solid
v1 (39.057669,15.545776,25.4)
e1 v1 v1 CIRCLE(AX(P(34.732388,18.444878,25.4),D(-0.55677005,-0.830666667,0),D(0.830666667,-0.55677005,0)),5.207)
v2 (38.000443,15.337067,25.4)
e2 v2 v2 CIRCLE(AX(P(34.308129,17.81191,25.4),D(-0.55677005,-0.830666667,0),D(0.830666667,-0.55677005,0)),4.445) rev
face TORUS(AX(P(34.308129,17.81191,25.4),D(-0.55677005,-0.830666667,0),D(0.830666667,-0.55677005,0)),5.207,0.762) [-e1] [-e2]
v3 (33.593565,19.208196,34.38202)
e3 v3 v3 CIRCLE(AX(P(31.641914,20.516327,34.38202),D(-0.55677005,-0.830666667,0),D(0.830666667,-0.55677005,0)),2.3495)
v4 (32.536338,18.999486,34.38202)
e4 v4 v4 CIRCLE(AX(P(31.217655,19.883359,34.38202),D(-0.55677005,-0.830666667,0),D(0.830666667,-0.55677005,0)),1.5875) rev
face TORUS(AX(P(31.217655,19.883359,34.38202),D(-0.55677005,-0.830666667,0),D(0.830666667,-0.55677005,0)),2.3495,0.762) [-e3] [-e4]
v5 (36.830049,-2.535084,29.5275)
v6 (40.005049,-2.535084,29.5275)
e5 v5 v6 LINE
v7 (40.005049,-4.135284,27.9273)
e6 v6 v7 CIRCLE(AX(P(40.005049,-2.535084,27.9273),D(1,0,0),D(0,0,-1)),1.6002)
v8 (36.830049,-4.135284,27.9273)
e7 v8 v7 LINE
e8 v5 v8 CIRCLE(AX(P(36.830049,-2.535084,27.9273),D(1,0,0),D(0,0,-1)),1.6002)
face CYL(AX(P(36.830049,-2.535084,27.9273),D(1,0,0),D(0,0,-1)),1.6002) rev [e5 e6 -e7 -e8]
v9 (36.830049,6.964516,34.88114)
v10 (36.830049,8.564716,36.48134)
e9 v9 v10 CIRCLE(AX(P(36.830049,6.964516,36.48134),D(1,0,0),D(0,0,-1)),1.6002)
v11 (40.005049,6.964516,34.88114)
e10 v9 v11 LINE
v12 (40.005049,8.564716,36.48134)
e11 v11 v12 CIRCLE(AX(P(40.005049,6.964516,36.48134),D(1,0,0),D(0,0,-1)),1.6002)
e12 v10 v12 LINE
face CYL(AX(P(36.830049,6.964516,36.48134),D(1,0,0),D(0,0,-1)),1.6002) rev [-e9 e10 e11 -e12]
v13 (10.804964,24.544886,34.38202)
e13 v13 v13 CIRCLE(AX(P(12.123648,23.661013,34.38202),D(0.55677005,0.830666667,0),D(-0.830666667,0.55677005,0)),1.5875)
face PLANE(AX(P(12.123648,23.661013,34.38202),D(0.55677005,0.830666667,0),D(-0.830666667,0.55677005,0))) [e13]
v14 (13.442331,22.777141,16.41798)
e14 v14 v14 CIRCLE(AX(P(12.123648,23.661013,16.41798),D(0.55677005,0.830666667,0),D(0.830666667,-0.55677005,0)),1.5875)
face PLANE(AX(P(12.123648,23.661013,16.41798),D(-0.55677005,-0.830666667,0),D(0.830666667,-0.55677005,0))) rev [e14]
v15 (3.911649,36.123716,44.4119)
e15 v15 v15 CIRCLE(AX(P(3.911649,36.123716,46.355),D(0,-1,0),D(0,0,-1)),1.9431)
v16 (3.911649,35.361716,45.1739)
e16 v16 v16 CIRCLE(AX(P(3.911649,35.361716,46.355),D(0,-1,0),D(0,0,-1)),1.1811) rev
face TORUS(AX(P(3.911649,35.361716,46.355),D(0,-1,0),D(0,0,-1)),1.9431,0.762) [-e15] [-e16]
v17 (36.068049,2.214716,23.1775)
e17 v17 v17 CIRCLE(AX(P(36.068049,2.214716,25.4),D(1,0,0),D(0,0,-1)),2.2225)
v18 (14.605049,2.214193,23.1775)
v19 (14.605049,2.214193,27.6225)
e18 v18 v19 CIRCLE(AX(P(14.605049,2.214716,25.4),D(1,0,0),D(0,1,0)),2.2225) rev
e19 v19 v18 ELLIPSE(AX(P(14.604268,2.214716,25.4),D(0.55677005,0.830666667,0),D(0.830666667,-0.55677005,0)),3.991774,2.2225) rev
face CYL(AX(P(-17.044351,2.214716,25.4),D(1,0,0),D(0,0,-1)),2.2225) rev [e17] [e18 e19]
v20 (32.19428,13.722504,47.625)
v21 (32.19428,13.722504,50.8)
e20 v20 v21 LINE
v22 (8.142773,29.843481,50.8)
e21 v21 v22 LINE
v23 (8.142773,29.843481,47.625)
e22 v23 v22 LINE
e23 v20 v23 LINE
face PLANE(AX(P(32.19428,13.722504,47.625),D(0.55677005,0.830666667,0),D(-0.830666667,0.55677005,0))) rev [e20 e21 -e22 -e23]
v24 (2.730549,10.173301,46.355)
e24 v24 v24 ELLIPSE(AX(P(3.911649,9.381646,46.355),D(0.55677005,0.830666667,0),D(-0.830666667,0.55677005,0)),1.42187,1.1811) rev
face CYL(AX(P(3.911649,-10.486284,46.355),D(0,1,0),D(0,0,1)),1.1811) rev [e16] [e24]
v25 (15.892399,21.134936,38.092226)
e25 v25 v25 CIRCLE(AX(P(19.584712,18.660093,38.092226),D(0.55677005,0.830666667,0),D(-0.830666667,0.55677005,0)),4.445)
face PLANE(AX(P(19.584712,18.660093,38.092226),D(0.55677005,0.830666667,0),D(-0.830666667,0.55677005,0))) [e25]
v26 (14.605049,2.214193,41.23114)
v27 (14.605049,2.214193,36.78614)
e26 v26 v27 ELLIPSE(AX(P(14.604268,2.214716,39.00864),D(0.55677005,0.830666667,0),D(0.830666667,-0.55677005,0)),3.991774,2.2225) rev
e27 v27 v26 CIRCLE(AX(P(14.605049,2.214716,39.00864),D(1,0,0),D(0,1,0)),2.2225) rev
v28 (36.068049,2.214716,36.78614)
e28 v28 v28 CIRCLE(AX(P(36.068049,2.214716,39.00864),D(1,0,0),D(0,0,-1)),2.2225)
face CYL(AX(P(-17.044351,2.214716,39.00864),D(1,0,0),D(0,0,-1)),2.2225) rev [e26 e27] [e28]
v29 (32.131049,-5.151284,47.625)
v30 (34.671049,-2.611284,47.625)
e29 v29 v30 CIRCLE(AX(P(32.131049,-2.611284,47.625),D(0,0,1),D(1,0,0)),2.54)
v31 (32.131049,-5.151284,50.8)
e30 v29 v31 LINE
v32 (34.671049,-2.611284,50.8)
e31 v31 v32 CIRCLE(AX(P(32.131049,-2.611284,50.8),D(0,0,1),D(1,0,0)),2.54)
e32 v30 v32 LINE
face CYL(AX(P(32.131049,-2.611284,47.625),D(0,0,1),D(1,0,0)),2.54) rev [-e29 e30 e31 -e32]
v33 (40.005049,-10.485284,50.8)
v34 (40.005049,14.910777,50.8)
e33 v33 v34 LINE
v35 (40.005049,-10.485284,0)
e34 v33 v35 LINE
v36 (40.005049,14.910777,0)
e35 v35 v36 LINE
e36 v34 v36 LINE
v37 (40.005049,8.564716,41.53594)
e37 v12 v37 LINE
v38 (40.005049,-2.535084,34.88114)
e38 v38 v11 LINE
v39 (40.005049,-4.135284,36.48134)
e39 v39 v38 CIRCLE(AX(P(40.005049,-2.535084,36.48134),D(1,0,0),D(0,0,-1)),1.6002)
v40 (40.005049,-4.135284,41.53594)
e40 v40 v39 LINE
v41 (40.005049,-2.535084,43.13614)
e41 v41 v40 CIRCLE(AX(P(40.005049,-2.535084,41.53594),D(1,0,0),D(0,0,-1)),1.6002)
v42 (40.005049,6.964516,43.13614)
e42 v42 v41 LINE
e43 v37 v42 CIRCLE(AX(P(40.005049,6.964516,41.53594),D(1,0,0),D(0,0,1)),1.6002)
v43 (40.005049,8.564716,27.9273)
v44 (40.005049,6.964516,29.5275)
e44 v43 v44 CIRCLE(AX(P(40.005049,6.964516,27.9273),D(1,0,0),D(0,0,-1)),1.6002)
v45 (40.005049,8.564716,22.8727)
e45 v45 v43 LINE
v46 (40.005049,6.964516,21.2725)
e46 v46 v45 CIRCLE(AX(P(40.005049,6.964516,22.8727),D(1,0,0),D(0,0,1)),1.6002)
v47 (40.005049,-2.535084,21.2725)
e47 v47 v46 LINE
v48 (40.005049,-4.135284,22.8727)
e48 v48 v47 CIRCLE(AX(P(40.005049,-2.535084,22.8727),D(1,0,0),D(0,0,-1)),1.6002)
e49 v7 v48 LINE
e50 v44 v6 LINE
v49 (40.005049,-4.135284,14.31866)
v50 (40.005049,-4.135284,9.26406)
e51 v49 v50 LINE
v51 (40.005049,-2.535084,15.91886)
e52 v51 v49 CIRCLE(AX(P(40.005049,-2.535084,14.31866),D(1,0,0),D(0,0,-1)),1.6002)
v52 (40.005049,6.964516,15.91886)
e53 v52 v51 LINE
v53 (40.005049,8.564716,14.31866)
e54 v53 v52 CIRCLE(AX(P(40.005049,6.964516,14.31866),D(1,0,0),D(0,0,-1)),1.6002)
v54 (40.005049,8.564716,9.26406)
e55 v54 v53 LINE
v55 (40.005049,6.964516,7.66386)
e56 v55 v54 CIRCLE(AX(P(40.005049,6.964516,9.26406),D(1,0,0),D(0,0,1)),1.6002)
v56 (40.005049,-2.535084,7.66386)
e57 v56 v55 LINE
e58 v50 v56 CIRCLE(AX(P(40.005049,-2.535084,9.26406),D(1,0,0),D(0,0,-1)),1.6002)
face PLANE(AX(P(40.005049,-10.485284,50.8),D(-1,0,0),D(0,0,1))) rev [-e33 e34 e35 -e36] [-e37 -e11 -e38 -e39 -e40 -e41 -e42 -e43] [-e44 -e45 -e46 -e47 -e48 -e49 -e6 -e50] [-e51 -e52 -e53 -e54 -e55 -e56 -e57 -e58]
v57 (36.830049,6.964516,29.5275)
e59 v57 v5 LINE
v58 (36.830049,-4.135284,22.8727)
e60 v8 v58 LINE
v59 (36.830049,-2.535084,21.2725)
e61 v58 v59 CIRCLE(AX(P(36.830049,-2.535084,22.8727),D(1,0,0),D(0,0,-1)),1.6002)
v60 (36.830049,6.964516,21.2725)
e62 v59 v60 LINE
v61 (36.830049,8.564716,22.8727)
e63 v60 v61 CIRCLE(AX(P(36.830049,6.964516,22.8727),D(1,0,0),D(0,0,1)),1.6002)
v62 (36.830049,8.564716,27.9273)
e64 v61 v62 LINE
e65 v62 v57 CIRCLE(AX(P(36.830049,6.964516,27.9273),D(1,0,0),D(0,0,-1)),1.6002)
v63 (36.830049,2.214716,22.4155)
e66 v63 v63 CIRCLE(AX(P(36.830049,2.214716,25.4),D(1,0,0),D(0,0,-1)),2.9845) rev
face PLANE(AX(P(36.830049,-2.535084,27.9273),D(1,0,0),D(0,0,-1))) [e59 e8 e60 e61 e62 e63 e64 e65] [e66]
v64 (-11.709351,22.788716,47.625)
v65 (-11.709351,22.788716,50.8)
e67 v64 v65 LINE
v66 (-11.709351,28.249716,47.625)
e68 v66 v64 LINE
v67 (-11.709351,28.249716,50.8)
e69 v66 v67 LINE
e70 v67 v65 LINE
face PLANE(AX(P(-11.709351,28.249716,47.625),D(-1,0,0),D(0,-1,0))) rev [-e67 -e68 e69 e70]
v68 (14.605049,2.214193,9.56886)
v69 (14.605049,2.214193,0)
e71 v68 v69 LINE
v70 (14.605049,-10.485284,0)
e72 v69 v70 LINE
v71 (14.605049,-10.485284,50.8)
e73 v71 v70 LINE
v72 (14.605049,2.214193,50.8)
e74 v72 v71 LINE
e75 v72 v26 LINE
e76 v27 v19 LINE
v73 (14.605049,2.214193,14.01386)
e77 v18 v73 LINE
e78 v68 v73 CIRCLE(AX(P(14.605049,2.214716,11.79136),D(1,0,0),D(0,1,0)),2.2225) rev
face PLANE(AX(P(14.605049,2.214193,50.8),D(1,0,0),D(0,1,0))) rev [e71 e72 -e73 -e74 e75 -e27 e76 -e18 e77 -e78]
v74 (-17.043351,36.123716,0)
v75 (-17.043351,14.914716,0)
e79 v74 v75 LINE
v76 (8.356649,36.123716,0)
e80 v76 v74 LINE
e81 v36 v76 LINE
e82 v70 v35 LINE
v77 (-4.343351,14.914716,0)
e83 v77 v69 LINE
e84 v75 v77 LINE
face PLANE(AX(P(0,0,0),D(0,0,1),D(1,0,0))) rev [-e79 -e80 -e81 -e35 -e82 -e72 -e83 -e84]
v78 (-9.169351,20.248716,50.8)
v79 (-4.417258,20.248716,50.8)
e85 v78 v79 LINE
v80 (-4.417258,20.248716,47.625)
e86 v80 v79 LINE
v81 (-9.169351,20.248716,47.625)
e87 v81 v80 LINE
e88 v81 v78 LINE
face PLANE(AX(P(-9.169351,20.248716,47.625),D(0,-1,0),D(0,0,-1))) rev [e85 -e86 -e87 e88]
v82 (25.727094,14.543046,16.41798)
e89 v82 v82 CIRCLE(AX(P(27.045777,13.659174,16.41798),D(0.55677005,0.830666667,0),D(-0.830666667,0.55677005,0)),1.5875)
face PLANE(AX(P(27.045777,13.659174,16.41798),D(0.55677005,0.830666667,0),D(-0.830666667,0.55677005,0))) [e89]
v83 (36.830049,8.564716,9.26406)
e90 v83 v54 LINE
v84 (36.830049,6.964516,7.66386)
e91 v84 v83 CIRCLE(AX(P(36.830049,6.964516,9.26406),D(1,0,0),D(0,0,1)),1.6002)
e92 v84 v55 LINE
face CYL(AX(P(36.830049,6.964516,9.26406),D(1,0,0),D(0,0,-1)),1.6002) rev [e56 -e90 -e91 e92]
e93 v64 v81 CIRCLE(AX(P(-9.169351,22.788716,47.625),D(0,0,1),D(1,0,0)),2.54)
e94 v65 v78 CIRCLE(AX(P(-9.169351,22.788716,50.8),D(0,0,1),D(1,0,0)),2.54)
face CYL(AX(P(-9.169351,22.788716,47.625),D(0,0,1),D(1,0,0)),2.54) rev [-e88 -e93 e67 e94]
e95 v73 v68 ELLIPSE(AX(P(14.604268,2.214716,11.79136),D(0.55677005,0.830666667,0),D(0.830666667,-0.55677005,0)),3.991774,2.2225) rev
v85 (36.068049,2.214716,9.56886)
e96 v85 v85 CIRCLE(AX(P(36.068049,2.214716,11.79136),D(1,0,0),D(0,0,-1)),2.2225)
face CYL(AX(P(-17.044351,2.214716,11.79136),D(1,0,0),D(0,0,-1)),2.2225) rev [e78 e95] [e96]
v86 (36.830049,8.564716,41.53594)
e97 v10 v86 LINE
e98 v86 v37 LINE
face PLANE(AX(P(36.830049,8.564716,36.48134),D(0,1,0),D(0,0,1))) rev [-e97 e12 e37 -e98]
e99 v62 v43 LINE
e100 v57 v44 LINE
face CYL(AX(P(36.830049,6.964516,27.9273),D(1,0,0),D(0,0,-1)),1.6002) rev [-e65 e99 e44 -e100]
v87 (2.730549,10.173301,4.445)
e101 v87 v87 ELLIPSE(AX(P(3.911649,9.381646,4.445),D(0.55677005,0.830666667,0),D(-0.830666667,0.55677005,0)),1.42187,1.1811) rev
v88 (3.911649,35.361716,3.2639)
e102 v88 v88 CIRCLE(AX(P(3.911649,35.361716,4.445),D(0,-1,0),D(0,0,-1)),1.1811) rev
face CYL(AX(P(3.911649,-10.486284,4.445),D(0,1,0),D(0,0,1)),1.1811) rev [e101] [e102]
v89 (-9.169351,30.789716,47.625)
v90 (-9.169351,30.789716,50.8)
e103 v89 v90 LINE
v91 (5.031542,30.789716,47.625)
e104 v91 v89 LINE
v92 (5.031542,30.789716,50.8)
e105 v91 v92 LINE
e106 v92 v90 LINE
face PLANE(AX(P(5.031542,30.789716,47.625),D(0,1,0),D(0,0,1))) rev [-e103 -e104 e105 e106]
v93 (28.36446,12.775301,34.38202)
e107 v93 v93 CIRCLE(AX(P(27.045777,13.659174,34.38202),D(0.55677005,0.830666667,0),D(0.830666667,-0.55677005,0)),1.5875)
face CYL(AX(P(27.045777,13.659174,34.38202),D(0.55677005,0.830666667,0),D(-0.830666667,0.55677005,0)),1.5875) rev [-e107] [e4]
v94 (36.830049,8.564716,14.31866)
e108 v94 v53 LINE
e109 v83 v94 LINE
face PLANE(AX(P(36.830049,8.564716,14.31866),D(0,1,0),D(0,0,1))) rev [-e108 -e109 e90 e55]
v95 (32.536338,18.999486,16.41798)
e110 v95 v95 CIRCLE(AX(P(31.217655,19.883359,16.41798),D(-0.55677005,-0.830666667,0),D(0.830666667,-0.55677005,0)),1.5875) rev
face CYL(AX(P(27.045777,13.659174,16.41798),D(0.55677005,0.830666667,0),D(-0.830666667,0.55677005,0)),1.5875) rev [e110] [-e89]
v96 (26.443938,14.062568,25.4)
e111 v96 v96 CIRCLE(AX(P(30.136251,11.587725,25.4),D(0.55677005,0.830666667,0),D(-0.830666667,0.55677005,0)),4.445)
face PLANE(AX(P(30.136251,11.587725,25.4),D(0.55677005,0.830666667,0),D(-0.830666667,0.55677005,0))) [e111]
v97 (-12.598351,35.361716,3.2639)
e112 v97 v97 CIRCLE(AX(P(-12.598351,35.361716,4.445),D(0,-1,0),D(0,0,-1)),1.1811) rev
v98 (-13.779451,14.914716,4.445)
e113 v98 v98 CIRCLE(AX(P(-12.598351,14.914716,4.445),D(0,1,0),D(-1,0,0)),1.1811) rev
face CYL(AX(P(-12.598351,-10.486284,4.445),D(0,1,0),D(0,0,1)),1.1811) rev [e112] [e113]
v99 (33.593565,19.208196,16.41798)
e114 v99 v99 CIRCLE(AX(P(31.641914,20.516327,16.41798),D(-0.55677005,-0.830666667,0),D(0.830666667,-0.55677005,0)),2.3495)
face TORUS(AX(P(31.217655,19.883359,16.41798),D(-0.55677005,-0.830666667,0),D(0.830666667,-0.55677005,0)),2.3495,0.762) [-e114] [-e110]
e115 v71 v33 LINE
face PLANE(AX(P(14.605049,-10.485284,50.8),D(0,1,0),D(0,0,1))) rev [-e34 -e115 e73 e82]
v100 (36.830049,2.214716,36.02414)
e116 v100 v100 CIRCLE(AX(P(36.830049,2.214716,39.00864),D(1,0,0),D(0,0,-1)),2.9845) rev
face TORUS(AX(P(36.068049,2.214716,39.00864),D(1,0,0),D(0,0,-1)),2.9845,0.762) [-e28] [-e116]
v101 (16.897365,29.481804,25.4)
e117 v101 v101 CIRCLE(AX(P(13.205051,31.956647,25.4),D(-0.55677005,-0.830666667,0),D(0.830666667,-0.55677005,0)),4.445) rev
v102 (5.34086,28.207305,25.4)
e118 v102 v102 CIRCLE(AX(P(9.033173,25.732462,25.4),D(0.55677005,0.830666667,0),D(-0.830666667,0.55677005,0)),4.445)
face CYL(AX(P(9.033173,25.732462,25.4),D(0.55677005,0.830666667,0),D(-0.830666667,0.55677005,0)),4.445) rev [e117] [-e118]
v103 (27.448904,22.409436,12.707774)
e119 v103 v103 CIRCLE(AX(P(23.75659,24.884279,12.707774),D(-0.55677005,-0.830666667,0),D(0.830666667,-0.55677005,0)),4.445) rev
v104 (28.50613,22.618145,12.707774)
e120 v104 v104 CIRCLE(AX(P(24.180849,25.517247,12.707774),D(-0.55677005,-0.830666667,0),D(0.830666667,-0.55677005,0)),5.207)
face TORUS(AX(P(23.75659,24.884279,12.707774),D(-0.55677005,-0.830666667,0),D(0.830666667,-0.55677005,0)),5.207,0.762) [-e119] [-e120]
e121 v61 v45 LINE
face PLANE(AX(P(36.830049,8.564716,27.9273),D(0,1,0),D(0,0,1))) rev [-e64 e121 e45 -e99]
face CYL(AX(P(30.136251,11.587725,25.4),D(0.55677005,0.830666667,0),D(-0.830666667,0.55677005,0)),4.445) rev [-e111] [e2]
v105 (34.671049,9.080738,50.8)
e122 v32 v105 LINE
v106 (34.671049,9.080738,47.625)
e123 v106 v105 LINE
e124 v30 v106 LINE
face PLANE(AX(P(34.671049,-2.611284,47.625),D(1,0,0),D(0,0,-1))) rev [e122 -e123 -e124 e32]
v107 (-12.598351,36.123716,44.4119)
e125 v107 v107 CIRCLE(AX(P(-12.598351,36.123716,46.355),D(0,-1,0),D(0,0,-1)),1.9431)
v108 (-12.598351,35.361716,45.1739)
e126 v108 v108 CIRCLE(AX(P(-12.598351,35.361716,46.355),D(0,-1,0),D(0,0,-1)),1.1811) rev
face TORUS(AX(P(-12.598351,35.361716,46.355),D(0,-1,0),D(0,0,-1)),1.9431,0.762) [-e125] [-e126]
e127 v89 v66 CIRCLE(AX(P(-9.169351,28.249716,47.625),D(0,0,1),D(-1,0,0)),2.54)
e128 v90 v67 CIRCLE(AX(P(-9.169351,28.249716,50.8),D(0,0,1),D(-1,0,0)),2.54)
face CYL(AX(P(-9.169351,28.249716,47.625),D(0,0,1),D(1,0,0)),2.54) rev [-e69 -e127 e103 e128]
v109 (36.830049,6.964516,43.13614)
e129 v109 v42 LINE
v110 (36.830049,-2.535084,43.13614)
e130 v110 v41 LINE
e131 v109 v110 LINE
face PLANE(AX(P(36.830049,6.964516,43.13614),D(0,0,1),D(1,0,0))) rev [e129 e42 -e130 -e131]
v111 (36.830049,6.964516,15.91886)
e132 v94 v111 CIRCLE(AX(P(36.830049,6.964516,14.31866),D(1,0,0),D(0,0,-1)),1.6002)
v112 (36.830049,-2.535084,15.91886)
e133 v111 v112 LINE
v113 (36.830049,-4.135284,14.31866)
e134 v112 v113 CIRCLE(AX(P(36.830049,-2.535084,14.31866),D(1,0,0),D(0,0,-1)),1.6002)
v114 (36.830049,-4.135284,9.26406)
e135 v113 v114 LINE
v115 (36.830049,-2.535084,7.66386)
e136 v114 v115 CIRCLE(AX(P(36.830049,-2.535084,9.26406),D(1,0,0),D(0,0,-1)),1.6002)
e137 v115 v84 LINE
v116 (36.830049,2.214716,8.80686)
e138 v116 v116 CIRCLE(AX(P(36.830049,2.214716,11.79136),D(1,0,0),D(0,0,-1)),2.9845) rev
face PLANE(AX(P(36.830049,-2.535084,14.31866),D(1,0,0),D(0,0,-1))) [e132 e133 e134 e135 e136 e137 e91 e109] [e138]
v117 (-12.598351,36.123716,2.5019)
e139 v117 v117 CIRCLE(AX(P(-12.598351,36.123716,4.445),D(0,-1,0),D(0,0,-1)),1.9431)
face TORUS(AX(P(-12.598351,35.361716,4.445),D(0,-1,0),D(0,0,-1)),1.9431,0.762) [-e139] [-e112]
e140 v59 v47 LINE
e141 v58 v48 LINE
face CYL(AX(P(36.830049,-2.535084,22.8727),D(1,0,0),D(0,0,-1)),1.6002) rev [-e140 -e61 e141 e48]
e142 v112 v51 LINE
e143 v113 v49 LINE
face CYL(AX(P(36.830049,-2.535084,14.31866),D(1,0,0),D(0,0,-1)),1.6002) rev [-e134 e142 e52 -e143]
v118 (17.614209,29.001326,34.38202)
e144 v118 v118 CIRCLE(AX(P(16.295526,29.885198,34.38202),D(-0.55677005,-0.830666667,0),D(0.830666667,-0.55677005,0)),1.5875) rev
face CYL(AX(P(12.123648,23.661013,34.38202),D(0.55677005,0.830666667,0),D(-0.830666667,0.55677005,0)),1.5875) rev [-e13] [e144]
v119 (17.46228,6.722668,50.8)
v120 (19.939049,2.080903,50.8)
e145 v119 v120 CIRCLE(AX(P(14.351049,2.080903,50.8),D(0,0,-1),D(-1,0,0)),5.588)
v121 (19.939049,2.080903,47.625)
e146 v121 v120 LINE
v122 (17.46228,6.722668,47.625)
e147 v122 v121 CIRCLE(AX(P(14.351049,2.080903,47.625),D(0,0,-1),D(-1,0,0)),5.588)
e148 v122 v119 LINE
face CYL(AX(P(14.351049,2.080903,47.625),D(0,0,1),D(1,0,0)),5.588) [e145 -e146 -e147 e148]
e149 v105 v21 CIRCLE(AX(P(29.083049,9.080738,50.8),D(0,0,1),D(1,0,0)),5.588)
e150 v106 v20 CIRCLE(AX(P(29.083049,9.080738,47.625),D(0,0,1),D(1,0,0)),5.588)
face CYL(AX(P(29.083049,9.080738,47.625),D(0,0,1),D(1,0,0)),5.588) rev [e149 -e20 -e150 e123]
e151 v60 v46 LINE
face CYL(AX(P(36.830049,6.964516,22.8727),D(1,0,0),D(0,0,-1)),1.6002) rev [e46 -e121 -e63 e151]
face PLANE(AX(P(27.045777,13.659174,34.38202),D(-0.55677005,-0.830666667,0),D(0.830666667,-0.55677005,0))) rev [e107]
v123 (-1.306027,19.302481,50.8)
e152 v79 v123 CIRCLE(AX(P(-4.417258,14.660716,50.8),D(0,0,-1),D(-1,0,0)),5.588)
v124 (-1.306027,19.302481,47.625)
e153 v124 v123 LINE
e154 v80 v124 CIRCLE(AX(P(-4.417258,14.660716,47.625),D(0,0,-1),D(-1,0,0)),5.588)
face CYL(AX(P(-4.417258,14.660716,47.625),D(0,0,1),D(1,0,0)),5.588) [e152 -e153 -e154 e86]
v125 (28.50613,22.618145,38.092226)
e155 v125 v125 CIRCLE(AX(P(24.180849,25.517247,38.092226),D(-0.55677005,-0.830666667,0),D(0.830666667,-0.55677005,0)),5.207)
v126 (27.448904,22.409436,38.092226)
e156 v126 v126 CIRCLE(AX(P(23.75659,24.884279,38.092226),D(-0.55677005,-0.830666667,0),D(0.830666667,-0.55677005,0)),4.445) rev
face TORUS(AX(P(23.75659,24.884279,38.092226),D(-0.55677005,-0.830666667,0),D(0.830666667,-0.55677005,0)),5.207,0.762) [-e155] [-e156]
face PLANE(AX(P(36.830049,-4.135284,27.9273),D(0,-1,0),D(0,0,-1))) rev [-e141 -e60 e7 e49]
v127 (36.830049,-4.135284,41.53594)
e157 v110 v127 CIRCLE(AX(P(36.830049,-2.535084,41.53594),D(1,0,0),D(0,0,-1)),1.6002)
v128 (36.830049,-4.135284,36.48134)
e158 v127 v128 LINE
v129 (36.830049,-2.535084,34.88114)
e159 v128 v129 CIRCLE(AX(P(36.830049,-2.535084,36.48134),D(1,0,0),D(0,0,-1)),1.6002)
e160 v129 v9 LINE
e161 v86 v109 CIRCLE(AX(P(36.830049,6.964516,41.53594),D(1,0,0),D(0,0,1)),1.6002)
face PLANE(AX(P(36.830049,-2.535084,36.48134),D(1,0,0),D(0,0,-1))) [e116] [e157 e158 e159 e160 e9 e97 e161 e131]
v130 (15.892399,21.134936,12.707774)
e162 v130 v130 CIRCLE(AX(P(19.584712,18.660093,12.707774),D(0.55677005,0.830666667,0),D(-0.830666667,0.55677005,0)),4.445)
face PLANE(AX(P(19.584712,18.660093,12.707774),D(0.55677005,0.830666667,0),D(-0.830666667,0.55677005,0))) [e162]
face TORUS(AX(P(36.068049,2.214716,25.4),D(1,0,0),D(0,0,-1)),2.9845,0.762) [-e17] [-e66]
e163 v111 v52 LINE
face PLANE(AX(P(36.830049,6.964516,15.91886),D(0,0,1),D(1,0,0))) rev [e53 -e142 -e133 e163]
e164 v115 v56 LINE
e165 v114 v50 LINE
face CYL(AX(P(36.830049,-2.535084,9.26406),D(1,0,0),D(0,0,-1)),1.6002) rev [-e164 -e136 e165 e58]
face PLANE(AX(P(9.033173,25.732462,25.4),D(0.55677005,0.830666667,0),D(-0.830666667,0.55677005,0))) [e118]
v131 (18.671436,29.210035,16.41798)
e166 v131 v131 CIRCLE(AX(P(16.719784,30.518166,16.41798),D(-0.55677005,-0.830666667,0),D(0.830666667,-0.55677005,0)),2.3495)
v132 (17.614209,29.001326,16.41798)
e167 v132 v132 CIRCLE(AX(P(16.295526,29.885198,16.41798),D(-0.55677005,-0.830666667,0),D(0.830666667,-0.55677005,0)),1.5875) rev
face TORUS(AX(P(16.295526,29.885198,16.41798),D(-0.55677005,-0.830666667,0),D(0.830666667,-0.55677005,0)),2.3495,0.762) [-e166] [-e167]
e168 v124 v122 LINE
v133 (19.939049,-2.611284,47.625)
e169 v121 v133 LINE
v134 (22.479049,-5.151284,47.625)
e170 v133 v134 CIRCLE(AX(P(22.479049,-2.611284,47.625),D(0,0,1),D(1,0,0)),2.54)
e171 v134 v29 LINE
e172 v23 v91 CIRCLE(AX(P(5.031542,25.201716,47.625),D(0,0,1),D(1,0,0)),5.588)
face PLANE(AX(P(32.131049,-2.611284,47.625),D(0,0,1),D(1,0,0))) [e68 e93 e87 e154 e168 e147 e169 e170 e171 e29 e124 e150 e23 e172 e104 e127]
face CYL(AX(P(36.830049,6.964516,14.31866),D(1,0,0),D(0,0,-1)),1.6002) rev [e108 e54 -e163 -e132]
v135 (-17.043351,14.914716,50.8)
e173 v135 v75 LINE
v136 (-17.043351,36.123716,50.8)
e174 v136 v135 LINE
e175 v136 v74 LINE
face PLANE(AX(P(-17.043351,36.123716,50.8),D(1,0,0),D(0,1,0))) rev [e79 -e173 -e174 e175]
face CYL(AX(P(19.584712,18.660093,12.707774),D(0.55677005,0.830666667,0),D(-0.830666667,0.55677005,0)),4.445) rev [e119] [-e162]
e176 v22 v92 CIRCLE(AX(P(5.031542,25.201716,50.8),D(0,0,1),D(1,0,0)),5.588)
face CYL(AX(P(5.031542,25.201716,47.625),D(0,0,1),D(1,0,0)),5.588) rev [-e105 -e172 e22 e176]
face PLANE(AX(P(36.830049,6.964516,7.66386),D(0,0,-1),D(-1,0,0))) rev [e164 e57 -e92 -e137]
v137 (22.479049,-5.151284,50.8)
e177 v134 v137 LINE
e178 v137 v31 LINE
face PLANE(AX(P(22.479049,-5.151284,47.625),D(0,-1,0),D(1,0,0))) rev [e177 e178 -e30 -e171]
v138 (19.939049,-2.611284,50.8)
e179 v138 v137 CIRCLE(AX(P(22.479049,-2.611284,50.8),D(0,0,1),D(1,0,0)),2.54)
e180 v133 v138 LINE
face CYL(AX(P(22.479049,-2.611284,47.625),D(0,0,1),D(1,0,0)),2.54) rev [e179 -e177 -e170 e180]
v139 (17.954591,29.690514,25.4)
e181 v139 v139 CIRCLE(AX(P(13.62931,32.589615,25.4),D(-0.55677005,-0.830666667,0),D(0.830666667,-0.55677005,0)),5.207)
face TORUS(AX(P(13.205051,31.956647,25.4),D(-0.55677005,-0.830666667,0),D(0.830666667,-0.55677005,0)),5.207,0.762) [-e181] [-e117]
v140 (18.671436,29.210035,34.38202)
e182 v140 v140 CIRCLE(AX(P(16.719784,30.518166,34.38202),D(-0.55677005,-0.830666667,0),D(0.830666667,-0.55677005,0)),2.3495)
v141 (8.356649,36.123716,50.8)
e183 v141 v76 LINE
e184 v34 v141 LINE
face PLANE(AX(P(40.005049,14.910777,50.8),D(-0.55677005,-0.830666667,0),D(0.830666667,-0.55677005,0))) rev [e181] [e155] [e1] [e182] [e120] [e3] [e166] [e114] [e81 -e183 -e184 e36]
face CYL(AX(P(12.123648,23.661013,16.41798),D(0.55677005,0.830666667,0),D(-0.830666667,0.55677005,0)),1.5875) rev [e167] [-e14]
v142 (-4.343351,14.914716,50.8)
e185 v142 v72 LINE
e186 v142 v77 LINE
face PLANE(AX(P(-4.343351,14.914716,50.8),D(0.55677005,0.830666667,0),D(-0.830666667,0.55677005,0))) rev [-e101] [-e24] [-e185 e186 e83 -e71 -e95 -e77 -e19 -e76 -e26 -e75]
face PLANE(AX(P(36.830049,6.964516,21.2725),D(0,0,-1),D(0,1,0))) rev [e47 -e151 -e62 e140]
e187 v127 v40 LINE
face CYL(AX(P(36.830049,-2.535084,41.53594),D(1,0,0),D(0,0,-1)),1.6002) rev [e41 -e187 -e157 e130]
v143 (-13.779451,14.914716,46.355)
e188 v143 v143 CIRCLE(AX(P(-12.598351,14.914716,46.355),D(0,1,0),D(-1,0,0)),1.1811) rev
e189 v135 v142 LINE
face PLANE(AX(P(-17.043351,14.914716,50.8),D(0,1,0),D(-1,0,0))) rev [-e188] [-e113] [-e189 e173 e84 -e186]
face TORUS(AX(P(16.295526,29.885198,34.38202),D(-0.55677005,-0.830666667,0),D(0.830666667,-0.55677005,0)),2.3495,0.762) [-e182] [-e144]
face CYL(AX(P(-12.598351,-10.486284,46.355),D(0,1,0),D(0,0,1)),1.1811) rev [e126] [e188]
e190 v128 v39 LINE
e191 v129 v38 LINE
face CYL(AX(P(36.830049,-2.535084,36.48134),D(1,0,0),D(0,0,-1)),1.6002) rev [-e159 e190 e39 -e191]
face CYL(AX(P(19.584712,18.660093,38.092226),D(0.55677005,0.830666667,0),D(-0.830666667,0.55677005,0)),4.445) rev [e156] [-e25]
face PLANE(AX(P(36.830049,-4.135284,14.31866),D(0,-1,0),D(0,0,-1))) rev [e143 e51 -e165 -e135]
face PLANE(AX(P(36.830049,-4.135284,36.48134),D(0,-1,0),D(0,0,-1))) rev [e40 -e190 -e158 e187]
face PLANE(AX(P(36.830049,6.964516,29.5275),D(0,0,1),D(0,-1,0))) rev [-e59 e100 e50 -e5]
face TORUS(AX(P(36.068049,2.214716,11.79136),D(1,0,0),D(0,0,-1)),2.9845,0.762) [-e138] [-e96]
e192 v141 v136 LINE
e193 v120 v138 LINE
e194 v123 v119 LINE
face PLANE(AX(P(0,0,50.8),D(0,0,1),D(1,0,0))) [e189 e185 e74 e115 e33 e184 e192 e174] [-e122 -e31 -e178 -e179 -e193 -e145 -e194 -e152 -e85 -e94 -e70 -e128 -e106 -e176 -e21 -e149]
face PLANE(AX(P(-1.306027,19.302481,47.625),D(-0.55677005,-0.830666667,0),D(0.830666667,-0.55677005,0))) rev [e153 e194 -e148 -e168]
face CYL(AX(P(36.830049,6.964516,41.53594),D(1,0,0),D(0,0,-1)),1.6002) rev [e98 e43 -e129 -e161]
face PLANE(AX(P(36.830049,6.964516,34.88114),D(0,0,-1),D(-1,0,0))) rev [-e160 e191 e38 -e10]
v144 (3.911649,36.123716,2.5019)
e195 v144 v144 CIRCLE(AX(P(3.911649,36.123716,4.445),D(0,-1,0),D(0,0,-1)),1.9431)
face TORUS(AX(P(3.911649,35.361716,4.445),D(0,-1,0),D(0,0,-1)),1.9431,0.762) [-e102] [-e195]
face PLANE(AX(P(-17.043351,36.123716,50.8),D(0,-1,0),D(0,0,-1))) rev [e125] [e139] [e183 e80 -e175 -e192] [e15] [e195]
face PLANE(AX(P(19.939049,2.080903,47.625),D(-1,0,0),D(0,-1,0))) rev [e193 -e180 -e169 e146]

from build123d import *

# Parameters (mm, degrees)
BOSS_EXTRUDE1_DEPTH = 50.8
SKETCH2_R           = 4.445
SKETCH2_R_2         = 1.5875
CUT_EXTRUDE1_DEPTH  = 8.255
FILLET1_R           = 0.762
CUT_EXTRUDE4_DEPTH  = 3.175
CUT_EXTRUDE5_REACH  = 84.389
SKETCH4_R           = 2.2225
FILLET2_R           = 0.762
CUT_EXTRUDE6_REACH  = 81.708
SKETCH5_R           = 1.1811
FILLET3_R           = 0.762
CUT_EXTRUDE7_START  = 47.625
CUT_EXTRUDE7_DEPTH  = 3.175


# Read off the part's stored shape, not the designer's step: Cut-Extrude7
with BuildPart() as part:
    # Sketch1 → Boss-Extrude1 (new body)
    with BuildSketch(Plane.XY):
        Polygon((-17.04335092, 14.914716129), (-4.34335092, 14.914716129), (14.60504908, 2.214192509), (14.60504908, -10.485283871), (40.00504908, -10.485283871), (40.00504908, 14.910777213), (8.35664908, 36.123716129), (-17.04335092, 36.123716129), align=None)
    extrude(amount=BOSS_EXTRUDE1_DEPTH)

    # Sketch2 → Cut-Extrude1 (cut)
    with BuildSketch(Plane(origin=(19.297370886, 28.790490331, 0), x_dir=(0.8306666666666668, -0.5567700502800853, 0), z_dir=(0.5567700502800853, 0.8306666666666668, 0))):
        with Locations(Location((5.878986591, -12.707773671, 0), (0, 0, 180))):
            Circle(SKETCH2_R)
        with Locations(Location((5.878986591, -38.092226329, 0), (0, 0, 180))):
            Circle(SKETCH2_R)
        with Locations(Location((-6.823508152, -25.4, 0), (0, 0, 180))):
            Circle(SKETCH2_R)
        with Locations(Location((18.581481333, -25.4, 0), (0, 0, 180))):
            Circle(SKETCH2_R)
        with Locations(Location((-3.10303358, -34.38202017, 0), (0, 0, 180))):
            Circle(SKETCH2_R_2)
        with Locations((14.861006761, -34.38202017)):
            Circle(SKETCH2_R_2)
        with Locations((-3.10303358, -16.41797983)):
            Circle(SKETCH2_R_2)
        with Locations(Location((14.861006761, -16.41797983, 0), (0, 0, 180))):
            Circle(SKETCH2_R_2)
    extrude(amount=-CUT_EXTRUDE1_DEPTH, mode=Mode.SUBTRACT)

    # Fillet1
    fillet1_edges = [part.edges().sort_by_distance(p)[0] for p in [
        (18.038467659, 29.634294038, 34.38202017),
        (38.42470138, 15.970035161, 25.4),
        (17.321623448, 30.114772434, 25.4),
        (27.873162414, 23.042403798, 38.092226329),
        (32.960597168, 19.632454395, 16.41797983),
        (15.401100992, 31.402038948, 16.41797983),
        (30.323230502, 21.400199304, 34.38202017),
        (27.873162414, 23.042403798, 12.707773671),
    ]]
    fillet(fillet1_edges, radius=FILLET1_R)

    # Sketch3 → Cut-Extrude4 (cut)
    with BuildSketch(Plane(origin=(40.00504908, 0, 0), x_dir=(0, 0, -1), z_dir=(1, 0, 0))):
        with BuildLine():
            Line((-43.136139989, 6.964516129), (-43.136139989, -2.535083871))
            ThreePointArc((-43.136139989, -2.535083871), (-42.66745226, -3.666596142), (-41.535939989, -4.135283871))
            Line((-41.535939989, -4.135283871), (-36.481339989, -4.135283871))
            ThreePointArc((-36.481339989, -4.135283871), (-35.349827718, -3.666596142), (-34.881139989, -2.535083871))
            Line((-34.881139989, -2.535083871), (-34.881139989, 6.964516129))
            ThreePointArc((-34.881139989, 6.964516129), (-35.349827718, 8.0960284), (-36.481339989, 8.564716129))
            Line((-36.481339989, 8.564716129), (-41.535939989, 8.564716129))
            ThreePointArc((-41.535939989, 8.564716129), (-42.66745226, 8.0960284), (-43.136139989, 6.964516129))
        make_face()
        with BuildLine():
            Line((-27.9273, 8.564716129), (-22.8727, 8.564716129))
            ThreePointArc((-22.8727, 8.564716129), (-21.741187729, 8.0960284), (-21.2725, 6.964516129))
            Line((-21.2725, 6.964516129), (-21.2725, -2.535083871))
            ThreePointArc((-21.2725, -2.535083871), (-21.741187729, -3.666596142), (-22.8727, -4.135283871))
            Line((-22.8727, -4.135283871), (-27.9273, -4.135283871))
            ThreePointArc((-27.9273, -4.135283871), (-29.058812271, -3.666596142), (-29.5275, -2.535083871))
            Line((-29.5275, -2.535083871), (-29.5275, 6.964516129))
            ThreePointArc((-29.5275, 6.964516129), (-29.058812271, 8.0960284), (-27.9273, 8.564716129))
        make_face()
        with BuildLine():
            Line((-14.318660011, 8.564716129), (-9.264060011, 8.564716129))
            ThreePointArc((-9.264060011, 8.564716129), (-8.13254774, 8.0960284), (-7.663860011, 6.964516129))
            Line((-7.663860011, 6.964516129), (-7.663860011, -2.535083871))
            ThreePointArc((-7.663860011, -2.535083871), (-8.13254774, -3.666596142), (-9.264060011, -4.135283871))
            Line((-9.264060011, -4.135283871), (-14.318660011, -4.135283871))
            ThreePointArc((-14.318660011, -4.135283871), (-15.450172282, -3.666596142), (-15.918860011, -2.535083871))
            Line((-15.918860011, -2.535083871), (-15.918860011, 6.964516129))
            ThreePointArc((-15.918860011, 6.964516129), (-15.450172282, 8.0960284), (-14.318660011, 8.564716129))
        make_face()
    extrude(amount=-CUT_EXTRUDE4_DEPTH, mode=Mode.SUBTRACT)

    # Sketch4 → Cut-Extrude5 (cut, up to next)
    with BuildSketch(Plane(origin=(36.83004908, 0, 0), x_dir=(0, 0, -1), z_dir=(1, 0, 0)), mode=Mode.PRIVATE) as cut_extrude5_sk1:
        with Locations((-39.008639989, 2.214716129)):
            Circle(SKETCH4_R)
    cut_extrude5_tool1 = extrude(cut_extrude5_sk1.sketch, amount=-CUT_EXTRUDE5_REACH, mode=Mode.PRIVATE) & part.part
    # Sketch4 → Cut-Extrude5 (cut, up to next)
    with BuildSketch(Plane(origin=(36.83004908, 0, 0), x_dir=(0, 0, -1), z_dir=(1, 0, 0)), mode=Mode.PRIVATE) as cut_extrude5_sk2:
        with Locations((-25.4, 2.214716129)):
            Circle(SKETCH4_R)
    cut_extrude5_tool2 = extrude(cut_extrude5_sk2.sketch, amount=-CUT_EXTRUDE5_REACH, mode=Mode.PRIVATE) & part.part
    # Sketch4 → Cut-Extrude5 (cut, up to next)
    with BuildSketch(Plane(origin=(36.83004908, 0, 0), x_dir=(0, 0, -1), z_dir=(1, 0, 0)), mode=Mode.PRIVATE) as cut_extrude5_sk3:
        with Locations((-11.791360011, 2.214716129)):
            Circle(SKETCH4_R)
    cut_extrude5_tool3 = extrude(cut_extrude5_sk3.sketch, amount=-CUT_EXTRUDE5_REACH, mode=Mode.PRIVATE) & part.part
    add(cut_extrude5_tool1.solids().sort_by_distance((36.830049, 2.214716, 39.00864))[0], mode=Mode.SUBTRACT)
    add(cut_extrude5_tool2.solids().sort_by_distance((36.830049, 2.214716, 25.4))[0], mode=Mode.SUBTRACT)
    add(cut_extrude5_tool3.solids().sort_by_distance((36.830049, 2.214716, 11.79136))[0], mode=Mode.SUBTRACT)

    # Fillet2
    fillet2_edges = [part.edges().sort_by_distance(p)[0] for p in [
        (36.83004908, 2.214716129, 41.231139989),
        (36.83004908, 2.214716129, 27.6225),
        (36.83004908, 2.214716129, 14.013860011),
    ]]
    fillet(fillet2_edges, radius=FILLET2_R)

    # Sketch5 → Cut-Extrude6 (cut, up to next)
    with BuildSketch(Plane(origin=(0, 36.123716129, 0), x_dir=(1, 0, 0), z_dir=(0, 1, 0)), mode=Mode.PRIVATE) as cut_extrude6_sk1:
        with Locations(Location((-12.59835092, -4.445, 0), (0, 0, 270))):
            Circle(SKETCH5_R)
    cut_extrude6_tool1 = extrude(cut_extrude6_sk1.sketch, amount=-CUT_EXTRUDE6_REACH, mode=Mode.PRIVATE) & part.part
    # Sketch5 → Cut-Extrude6 (cut, up to next)
    with BuildSketch(Plane(origin=(0, 36.123716129, 0), x_dir=(1, 0, 0), z_dir=(0, 1, 0)), mode=Mode.PRIVATE) as cut_extrude6_sk2:
        with Locations(Location((3.91164908, -4.445, 0), (0, 0, 180))):
            Circle(SKETCH5_R)
    cut_extrude6_tool2 = extrude(cut_extrude6_sk2.sketch, amount=-CUT_EXTRUDE6_REACH, mode=Mode.PRIVATE) & part.part
    # Sketch5 → Cut-Extrude6 (cut, up to next)
    with BuildSketch(Plane(origin=(0, 36.123716129, 0), x_dir=(1, 0, 0), z_dir=(0, 1, 0)), mode=Mode.PRIVATE) as cut_extrude6_sk3:
        with Locations(Location((-12.59835092, -46.355, 0), (0, 0, 180))):
            Circle(SKETCH5_R)
    cut_extrude6_tool3 = extrude(cut_extrude6_sk3.sketch, amount=-CUT_EXTRUDE6_REACH, mode=Mode.PRIVATE) & part.part
    # Sketch5 → Cut-Extrude6 (cut, up to next)
    with BuildSketch(Plane(origin=(0, 36.123716129, 0), x_dir=(1, 0, 0), z_dir=(0, 1, 0)), mode=Mode.PRIVATE) as cut_extrude6_sk4:
        with Locations(Location((3.91164908, -46.355, 0), (0, 0, 270))):
            Circle(SKETCH5_R)
    cut_extrude6_tool4 = extrude(cut_extrude6_sk4.sketch, amount=-CUT_EXTRUDE6_REACH, mode=Mode.PRIVATE) & part.part
    add(cut_extrude6_tool1.solids().sort_by_distance((-12.598351, 36.123716, 4.445))[0], mode=Mode.SUBTRACT)
    add(cut_extrude6_tool2.solids().sort_by_distance((3.911649, 36.123716, 4.445))[0], mode=Mode.SUBTRACT)
    add(cut_extrude6_tool3.solids().sort_by_distance((-12.598351, 36.123716, 46.355))[0], mode=Mode.SUBTRACT)
    add(cut_extrude6_tool4.solids().sort_by_distance((3.911649, 36.123716, 46.355))[0], mode=Mode.SUBTRACT)

    # Fillet3
    fillet3_edges = [part.edges().sort_by_distance(p)[0] for p in [
        (5.09274908, 36.123716129, 4.445),
        (-11.41725092, 36.123716129, 46.355),
        (3.91164908, 36.123716129, 45.1739),
        (-12.59835092, 36.123716129, 3.2639),
    ]]
    fillet(fillet3_edges, radius=FILLET3_R)

    # Cut-Extrude7 outline → Cut-Extrude7 (cut)
    with BuildSketch(Plane.XY.offset(CUT_EXTRUDE7_START)):
        with BuildLine():
            Line((22.47904908, -5.151283871), (32.13104908, -5.151283871))
            ThreePointArc((32.13104908, -5.151283871), (33.927100305, -4.407335096), (34.67104908, -2.611283871))
            Line((34.67104908, -2.611283871), (34.67104908, 9.080738404))
            ThreePointArc((34.67104908, 9.080738404), (34.0131253, 11.711345268), (32.194280121, 13.722503737))
            Line((32.194280121, 13.722503737), (8.142772998, 29.843481462))
            ThreePointArc((8.142772998, 29.843481462), (6.657512331, 30.547926407), (5.031541957, 30.789716129))
            Line((5.031541957, 30.789716129), (-9.16935092, 30.789716129))
            ThreePointArc((-9.16935092, 30.789716129), (-10.965402144, 30.045767353), (-11.70935092, 28.249716129))
            Line((-11.70935092, 28.249716129), (-11.70935092, 22.788716129))
            ThreePointArc((-11.70935092, 22.788716129), (-10.965402144, 20.992664905), (-9.16935092, 20.248716129))
            Line((-9.16935092, 20.248716129), (-4.417258043, 20.248716129))
            ThreePointArc((-4.417258043, 20.248716129), (-2.791287669, 20.006926407), (-1.306027002, 19.302481462))
            Line((-1.306027002, 19.302481462), (17.462280121, 6.7226685))
            ThreePointArc((17.462280121, 6.7226685), (19.2811253, 4.71151003), (19.93904908, 2.080903166))
            Line((19.93904908, 2.080903166), (19.93904908, -2.611283871))
            ThreePointArc((19.93904908, -2.611283871), (20.682997856, -4.407335095), (22.47904908, -5.151283871))
        make_face()
    extrude(amount=CUT_EXTRUDE7_DEPTH, mode=Mode.SUBTRACT)


solid = part.part
